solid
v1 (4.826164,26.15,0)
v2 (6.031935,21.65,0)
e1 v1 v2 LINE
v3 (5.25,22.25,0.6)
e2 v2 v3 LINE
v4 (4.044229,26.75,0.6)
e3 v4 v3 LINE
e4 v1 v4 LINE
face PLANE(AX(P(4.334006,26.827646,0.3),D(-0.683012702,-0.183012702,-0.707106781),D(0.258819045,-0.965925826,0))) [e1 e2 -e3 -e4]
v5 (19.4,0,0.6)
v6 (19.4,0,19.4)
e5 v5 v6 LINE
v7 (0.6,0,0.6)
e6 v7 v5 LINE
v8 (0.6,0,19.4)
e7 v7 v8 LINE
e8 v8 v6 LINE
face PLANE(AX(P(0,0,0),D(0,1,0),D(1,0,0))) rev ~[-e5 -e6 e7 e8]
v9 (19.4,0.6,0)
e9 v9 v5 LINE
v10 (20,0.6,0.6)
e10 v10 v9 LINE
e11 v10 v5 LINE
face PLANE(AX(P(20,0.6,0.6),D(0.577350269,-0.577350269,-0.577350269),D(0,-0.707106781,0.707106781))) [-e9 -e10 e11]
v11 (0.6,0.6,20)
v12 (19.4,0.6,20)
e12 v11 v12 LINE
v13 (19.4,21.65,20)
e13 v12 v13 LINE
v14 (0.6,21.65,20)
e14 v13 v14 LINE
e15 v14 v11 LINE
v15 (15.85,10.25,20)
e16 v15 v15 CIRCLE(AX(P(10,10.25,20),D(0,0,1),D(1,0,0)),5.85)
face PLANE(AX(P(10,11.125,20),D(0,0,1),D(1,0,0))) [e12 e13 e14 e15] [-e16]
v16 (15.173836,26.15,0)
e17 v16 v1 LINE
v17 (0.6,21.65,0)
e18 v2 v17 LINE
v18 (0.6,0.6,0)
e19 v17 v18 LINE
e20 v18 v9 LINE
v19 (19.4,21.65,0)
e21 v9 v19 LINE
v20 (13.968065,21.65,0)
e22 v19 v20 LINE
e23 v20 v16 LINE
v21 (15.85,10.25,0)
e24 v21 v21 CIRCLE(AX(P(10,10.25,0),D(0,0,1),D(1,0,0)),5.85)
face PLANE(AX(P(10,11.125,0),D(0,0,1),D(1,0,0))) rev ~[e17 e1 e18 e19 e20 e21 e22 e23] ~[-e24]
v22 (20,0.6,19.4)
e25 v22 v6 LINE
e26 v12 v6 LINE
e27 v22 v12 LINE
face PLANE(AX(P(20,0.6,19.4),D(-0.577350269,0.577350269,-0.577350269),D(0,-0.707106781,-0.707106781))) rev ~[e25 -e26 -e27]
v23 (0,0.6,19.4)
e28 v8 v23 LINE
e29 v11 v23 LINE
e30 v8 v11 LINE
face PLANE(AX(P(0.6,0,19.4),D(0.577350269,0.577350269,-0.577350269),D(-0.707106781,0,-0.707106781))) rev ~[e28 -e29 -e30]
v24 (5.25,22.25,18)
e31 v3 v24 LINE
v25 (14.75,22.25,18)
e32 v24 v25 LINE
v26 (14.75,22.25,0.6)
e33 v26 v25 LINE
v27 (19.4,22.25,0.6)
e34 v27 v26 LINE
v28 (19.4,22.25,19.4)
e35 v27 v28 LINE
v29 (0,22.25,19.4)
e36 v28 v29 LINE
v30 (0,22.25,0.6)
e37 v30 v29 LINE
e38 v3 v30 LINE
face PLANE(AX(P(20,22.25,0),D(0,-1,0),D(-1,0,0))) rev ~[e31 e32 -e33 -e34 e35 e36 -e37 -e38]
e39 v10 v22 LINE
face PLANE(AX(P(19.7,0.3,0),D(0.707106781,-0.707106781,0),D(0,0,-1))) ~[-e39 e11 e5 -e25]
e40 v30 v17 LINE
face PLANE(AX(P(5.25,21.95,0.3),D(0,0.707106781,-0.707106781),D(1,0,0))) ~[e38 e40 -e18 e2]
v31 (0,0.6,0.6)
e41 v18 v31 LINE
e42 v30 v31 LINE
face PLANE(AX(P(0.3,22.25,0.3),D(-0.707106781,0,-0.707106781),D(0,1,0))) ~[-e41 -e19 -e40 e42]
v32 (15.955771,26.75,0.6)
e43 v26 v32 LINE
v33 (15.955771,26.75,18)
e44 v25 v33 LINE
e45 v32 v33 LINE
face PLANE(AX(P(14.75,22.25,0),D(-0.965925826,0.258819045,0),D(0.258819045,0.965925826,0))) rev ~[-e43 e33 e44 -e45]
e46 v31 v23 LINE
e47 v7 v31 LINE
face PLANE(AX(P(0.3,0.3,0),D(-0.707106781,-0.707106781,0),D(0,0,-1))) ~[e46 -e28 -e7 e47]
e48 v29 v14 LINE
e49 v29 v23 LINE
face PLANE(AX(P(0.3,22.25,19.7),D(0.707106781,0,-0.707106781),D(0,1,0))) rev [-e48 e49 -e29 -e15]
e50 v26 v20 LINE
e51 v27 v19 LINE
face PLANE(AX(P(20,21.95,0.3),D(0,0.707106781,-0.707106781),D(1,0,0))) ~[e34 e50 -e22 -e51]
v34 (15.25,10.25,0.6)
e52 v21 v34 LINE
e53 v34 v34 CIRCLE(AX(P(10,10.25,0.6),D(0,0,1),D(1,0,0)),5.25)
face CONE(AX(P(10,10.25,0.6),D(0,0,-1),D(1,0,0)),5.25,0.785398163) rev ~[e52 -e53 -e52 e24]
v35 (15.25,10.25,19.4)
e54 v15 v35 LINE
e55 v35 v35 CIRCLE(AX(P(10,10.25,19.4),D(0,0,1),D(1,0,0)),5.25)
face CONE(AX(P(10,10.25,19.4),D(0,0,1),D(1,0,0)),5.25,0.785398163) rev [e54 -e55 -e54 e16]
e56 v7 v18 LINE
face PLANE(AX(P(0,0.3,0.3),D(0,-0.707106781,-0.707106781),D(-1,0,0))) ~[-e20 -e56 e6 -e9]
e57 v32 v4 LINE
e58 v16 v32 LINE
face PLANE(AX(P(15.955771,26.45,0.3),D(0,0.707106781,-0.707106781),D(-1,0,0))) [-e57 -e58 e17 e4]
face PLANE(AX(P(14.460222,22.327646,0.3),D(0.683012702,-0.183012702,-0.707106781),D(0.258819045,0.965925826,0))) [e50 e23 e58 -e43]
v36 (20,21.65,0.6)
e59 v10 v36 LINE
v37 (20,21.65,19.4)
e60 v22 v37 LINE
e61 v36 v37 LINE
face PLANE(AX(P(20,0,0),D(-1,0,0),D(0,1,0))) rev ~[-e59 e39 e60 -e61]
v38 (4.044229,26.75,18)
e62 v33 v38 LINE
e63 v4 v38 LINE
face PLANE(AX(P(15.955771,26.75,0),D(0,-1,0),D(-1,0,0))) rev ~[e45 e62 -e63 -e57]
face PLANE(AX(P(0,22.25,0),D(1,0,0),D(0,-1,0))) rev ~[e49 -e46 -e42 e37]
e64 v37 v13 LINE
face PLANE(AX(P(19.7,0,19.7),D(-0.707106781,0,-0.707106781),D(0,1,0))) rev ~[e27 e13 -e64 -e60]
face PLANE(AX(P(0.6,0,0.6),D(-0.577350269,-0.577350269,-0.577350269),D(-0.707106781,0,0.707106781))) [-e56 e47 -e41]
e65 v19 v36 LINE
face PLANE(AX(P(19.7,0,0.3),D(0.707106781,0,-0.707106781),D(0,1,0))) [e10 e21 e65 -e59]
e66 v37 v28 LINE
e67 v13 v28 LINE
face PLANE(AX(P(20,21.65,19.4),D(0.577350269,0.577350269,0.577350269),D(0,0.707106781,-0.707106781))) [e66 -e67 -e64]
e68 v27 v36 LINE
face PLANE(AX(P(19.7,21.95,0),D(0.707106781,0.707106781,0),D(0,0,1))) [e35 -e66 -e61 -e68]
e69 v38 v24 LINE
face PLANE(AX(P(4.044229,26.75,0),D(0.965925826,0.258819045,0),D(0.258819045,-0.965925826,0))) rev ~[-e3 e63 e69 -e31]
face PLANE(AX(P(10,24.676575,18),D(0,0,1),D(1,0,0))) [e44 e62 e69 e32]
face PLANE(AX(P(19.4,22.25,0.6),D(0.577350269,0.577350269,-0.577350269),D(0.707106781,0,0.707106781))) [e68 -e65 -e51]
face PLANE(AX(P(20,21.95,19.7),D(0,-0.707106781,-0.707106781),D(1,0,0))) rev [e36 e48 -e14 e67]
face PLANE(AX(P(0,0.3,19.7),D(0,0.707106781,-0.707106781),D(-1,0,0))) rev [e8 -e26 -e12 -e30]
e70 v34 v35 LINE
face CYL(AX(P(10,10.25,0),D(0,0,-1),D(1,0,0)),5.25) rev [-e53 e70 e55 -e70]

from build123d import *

# Parameters (mm, degrees)
F2_R     = 5.25
F3_DEPTH = 20
F4_DEPTH = 18
F5_SIZE  = 0.6


# Not quite as in the source:
# - a feature names something its author has since deleted; it is built from what else it names


with BuildPart() as f3:
    # F2 (on Top) → F3 (new body)
    with BuildSketch(Plane.XY):
        Polygon((5.25, 22.25), (0, 22.25), (0, 0), (20, 0), (20, 22.25), (14.75, 22.25), align=None)
        with Locations((10, 10.25)):
            Circle(F2_R, mode=Mode.SUBTRACT)
    extrude(amount=F3_DEPTH)

    # F2 (on Top) → F4 (join)
    with BuildSketch(Plane.XY):
        Polygon((4.0442286341, 26.75), (5.25, 22.25), (14.75, 22.25), (15.9557713659, 26.75), align=None)
    extrude(amount=F4_DEPTH)

    # F5
    f5_edges = [f3.edges().sort_by_distance(p)[0] for p in [
        (0, 11.125, 0),
        (10, 0, 0),
        (20, 11.125, 0),
        (17.375, 22.25, 0),
        (15.352886, 24.5, 0),
        (10, 26.75, 0),
        (4.647114, 24.5, 0),
        (2.625, 22.25, 0),
        (4.75, 10.25, 0),
        (10, 22.25, 20),
        (0, 11.125, 20),
        (10, 0, 20),
        (20, 11.125, 20),
        (4.75, 10.25, 20),
        (0, 0, 10),
        (20, 0, 10),
        (20, 22.25, 10),
    ]]
    chamfer(f5_edges, length=F5_SIZE)


solid = f3.part
